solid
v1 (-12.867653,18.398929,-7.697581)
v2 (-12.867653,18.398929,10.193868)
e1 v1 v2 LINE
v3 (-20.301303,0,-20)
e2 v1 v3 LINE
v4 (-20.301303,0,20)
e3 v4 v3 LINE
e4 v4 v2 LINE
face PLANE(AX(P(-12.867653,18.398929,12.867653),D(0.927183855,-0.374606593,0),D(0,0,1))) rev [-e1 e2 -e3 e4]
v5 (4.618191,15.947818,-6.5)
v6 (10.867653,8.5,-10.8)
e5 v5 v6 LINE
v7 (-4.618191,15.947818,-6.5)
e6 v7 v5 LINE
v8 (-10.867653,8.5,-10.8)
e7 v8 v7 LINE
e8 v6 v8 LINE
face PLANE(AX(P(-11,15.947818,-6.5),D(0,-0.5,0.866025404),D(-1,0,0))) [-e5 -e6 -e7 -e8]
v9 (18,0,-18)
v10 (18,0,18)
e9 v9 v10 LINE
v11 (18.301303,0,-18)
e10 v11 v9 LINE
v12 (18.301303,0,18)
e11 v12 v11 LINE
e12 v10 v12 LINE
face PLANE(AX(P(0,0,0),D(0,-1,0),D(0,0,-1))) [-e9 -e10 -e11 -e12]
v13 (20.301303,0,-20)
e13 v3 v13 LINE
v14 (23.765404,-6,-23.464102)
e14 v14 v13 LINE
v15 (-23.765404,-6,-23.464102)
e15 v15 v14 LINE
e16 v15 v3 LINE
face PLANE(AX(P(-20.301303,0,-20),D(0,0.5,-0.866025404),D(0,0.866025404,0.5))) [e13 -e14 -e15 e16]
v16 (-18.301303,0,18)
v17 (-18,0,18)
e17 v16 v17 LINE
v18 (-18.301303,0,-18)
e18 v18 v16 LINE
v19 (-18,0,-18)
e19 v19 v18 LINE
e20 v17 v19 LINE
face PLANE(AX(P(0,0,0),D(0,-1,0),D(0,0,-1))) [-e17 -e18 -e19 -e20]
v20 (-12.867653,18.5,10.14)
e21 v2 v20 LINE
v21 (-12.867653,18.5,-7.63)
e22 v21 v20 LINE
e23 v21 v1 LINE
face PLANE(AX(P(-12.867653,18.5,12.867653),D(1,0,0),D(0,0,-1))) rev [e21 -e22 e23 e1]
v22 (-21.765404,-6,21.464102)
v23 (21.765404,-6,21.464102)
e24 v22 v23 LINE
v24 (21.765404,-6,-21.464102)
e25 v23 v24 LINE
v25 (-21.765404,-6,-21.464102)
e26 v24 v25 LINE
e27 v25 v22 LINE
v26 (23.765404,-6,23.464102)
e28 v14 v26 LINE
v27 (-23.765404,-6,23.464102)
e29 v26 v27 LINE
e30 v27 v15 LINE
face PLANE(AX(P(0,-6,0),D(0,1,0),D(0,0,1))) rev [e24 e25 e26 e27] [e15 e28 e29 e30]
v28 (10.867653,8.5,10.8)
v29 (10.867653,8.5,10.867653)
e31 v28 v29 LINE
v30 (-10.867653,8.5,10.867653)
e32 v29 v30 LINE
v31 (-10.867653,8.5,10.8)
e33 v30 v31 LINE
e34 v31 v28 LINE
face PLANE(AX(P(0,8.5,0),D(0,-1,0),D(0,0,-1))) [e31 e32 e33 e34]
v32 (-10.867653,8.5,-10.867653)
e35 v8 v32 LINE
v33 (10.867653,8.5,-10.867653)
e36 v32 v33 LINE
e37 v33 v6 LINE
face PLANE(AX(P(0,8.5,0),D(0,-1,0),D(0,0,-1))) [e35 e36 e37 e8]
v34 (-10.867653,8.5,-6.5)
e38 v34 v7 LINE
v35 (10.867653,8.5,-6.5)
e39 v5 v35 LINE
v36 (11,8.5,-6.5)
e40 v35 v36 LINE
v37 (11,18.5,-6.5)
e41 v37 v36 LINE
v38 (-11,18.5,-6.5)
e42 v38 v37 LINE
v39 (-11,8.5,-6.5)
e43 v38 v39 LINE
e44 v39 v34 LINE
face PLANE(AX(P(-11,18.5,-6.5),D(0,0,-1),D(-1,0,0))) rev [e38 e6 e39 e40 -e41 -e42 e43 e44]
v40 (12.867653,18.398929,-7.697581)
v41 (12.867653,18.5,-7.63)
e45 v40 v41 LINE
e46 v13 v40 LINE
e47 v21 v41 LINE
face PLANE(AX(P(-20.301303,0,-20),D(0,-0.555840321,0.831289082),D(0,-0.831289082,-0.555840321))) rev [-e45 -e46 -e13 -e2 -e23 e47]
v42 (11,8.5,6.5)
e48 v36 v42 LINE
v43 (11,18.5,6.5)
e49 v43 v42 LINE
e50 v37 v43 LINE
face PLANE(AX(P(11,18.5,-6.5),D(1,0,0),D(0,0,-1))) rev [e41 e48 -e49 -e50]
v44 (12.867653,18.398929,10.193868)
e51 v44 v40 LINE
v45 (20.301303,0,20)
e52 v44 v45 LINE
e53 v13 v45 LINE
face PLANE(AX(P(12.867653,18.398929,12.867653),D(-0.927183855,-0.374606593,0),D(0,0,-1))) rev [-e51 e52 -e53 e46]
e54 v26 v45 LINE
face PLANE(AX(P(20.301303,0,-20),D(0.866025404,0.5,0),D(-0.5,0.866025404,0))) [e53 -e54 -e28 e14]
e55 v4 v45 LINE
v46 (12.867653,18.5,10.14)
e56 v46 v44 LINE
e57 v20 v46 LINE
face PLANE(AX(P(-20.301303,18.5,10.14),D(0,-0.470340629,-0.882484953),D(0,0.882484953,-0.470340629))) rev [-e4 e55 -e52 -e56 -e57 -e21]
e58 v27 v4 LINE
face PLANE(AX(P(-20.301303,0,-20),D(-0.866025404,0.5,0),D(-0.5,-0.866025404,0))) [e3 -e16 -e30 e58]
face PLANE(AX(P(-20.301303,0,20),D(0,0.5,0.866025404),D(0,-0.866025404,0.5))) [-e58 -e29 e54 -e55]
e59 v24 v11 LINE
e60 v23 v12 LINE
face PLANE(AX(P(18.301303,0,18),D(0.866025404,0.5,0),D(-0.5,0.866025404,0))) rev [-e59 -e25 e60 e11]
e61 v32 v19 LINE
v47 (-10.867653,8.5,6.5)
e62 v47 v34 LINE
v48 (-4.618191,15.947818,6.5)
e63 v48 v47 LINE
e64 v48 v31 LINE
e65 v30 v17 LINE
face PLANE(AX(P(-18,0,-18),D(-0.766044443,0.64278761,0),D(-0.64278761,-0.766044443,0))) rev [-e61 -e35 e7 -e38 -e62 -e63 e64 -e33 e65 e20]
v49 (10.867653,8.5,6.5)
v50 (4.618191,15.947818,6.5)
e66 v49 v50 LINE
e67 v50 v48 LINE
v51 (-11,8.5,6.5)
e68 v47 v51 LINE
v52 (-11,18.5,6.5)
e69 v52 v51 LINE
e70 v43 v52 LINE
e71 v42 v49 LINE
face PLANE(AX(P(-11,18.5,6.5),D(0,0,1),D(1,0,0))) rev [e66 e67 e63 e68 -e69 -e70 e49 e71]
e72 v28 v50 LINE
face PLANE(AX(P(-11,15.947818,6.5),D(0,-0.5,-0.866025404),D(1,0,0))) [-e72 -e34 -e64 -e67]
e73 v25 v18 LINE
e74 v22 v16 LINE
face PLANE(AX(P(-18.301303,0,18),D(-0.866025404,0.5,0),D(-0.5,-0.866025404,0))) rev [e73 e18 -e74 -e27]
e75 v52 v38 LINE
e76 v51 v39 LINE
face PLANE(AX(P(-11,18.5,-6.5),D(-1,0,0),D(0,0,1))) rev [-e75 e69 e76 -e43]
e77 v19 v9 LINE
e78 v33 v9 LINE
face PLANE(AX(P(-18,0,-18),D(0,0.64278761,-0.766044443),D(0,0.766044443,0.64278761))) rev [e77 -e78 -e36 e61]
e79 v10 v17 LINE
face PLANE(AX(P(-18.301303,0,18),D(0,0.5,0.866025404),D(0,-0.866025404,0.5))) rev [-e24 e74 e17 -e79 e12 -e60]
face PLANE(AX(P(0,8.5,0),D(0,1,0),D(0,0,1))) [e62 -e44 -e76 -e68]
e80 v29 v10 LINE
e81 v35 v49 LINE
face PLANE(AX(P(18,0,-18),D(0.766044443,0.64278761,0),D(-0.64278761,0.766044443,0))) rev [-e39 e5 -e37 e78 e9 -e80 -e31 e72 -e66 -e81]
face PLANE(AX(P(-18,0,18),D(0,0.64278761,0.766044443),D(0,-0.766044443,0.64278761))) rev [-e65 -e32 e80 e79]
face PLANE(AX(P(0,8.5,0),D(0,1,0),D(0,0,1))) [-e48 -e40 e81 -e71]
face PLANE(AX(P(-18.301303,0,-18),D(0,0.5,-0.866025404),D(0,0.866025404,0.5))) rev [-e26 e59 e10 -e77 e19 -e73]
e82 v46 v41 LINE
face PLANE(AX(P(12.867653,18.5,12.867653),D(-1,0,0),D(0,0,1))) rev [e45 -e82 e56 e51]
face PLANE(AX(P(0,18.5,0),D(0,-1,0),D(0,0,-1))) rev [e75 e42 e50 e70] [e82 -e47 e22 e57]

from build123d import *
from OCP.BRepFilletAPI import BRepFilletAPI_MakeChamfer

# Parameters (mm, degrees)
SKETCH1_W               = 40
SKETCH1_H               = 40
BOSS_EXTRUDE1_DEPTH     = 8.5
BOSS_EXTRUDE1_TAPER     = 40
SKETCH2_W               = 36
SKETCH2_H               = 36
CUT_EXTRUDE1_DEPTH      = 15
CUT_EXTRUDE1_DRAFT      = -40
SKETCH4_W               = 25.73530627
SKETCH4_H               = 25.73530627
BOSS_EXTRUDE3_DEPTH     = 10
SKETCH5_W               = 22
SKETCH5_H               = 13
CUT_EXTRUDE2_DEPTH      = 31.000000133
CHAMFER2_SIZE           = 12
CHAMFER2_SIZE_2         = 9.89892863
CUT_EXTRUDE3_DEPTH      = 35.154586706
CUT_EXTRUDE3_DEPTH_BACK = 35.154586706
CHAMFER3_SIZE           = 4.3
CHAMFER3_SIZE2          = 7.447818473
CUT_EXTRUDE4_DEPTH      = 35.154586706
CUT_EXTRUDE4_DEPTH_BACK = 35.154586706
SKETCH9_W               = 40.602605658
SKETCH9_H               = 40
BOSS_EXTRUDE4_DEPTH     = 6
BOSS_EXTRUDE4_DRAFT     = -30
SKETCH10_W              = 36.602605658
SKETCH10_H              = 36
CUT_EXTRUDE5_DEPTH      = 10
CUT_EXTRUDE5_DRAFT      = 30


with BuildPart() as part:
    # Sketch1 → Boss-Extrude1 (new body)
    with BuildSketch(Plane(origin=(0, 0, 0), x_dir=(1, 0, 0), z_dir=(0, 1, 0))):
        Rectangle(SKETCH1_W, SKETCH1_H)
    extrude(amount=BOSS_EXTRUDE1_DEPTH, taper=BOSS_EXTRUDE1_TAPER)


with BuildPart() as cut_extrude1_tool:
    # Sketch2 → Cut-Extrude1 (with draft: the straight prism first)
    with BuildSketch(Plane.XZ):
        Rectangle(SKETCH2_W, SKETCH2_H)
    extrude(amount=-CUT_EXTRUDE1_DEPTH)
    # Cut-Extrude1: the draft: its side faces are tilted about the plane it starts from
    cut_extrude1_sides = [cut_extrude1_tool.faces().sort_by_distance(p)[0] for p in [
        (0, 7.5, -18),
        (18, 7.5, 0),
        (0, 7.5, 18),
        (-18, 7.5, 0),
    ]]
    draft(cut_extrude1_sides, Plane.XZ, CUT_EXTRUDE1_DRAFT)


with BuildPart() as part_1:
    add(part.part)

    # Cut-Extrude1: cut by cut_extrude1_tool
    add(cut_extrude1_tool.part, mode=Mode.SUBTRACT)

    # Sketch4 → Boss-Extrude3 (add)
    with BuildSketch(Plane(origin=(0, 8.5, 0), x_dir=(1, 0, 0), z_dir=(0, 1, 0))):
        Rectangle(SKETCH4_W, SKETCH4_H)
    extrude(amount=BOSS_EXTRUDE3_DEPTH)

    # Sketch5 → Cut-Extrude2 (cut, through all)
    with BuildSketch(Plane.XZ.offset(-8.5)):
        Rectangle(SKETCH5_W, SKETCH5_H)
    extrude(amount=-CUT_EXTRUDE2_DEPTH, mode=Mode.SUBTRACT)

    # Chamfer2
    # the kernel refuses this chamfer: 12, 9.89892863 mm, written as the material it adds along each edge
    with BuildSketch(Plane(origin=(12.867653135, 8.5, 44.011128682), x_dir=(0.6427876096865404, -0.7660444431189772, 0), z_dir=(0, 0, -1))) as chamfer2_piece_1_section:
        Polygon((CHAMFER2_SIZE, 0), (-CHAMFER2_SIZE_2 * 0.766044443108, -CHAMFER2_SIZE_2 * 0.642787609677), (0, 0), align=None)
    chamfer2_piece_1 = extrude(amount=88.022257365, mode=Mode.PRIVATE)
    chamfer2_piece_1 = split(chamfer2_piece_1, bisect_by=Plane(origin=(12.867653135, 0, 44.011128682), z_dir=(0, 1, 0)), keep=Keep.TOP, mode=Mode.PRIVATE)
    chamfer2_piece_1 = split(chamfer2_piece_1, bisect_by=Plane(origin=(12.867653135, -0.927920344, 20.676206983), z_dir=(0, -0.37460659341591307, -0.9271838545667871)), keep=Keep.TOP, mode=Mode.PRIVATE)
    chamfer2_piece_1 = split(chamfer2_piece_1, bisect_by=Plane(origin=(12.867653135, 29.644778588, -8.32403482), z_dir=(0, -0.37460659341591274, 0.9271838545667872)), keep=Keep.TOP, mode=Mode.PRIVATE)
    add(chamfer2_piece_1)
    with BuildSketch(Plane(origin=(-12.867653135, 8.5, -44.011128682), x_dir=(-0.6427876096865406, -0.766044443118977, 0), z_dir=(0, 0, 1))) as chamfer2_piece_2_section:
        Polygon((CHAMFER2_SIZE, 0), (-CHAMFER2_SIZE_2 * 0.766044443108, -CHAMFER2_SIZE_2 * 0.642787609677), (0, 0), align=None)
    chamfer2_piece_2 = extrude(amount=88.022257365, mode=Mode.PRIVATE)
    chamfer2_piece_2 = split(chamfer2_piece_2, bisect_by=Plane(origin=(-12.867653135, 0, -44.011128682), z_dir=(0, 1, 0)), keep=Keep.TOP, mode=Mode.PRIVATE)
    chamfer2_piece_2 = split(chamfer2_piece_2, bisect_by=Plane(origin=(-12.867653135, -0.927920344, -20.676206983), z_dir=(0, -0.37460659341591274, 0.9271838545667872)), keep=Keep.TOP, mode=Mode.PRIVATE)
    chamfer2_piece_2 = split(chamfer2_piece_2, bisect_by=Plane(origin=(-12.867653135, 29.644778588, 8.32403482), z_dir=(0, -0.37460659341591307, -0.9271838545667871)), keep=Keep.TOP, mode=Mode.PRIVATE)
    add(chamfer2_piece_2)
    with BuildSketch(Plane(origin=(-44.011128682, 8.5, 12.867653135), x_dir=(0, -0.766044443118977, 0.6427876096865405), z_dir=(1, 0, 0))) as chamfer2_piece_3_section:
        Polygon((CHAMFER2_SIZE, 0), (-CHAMFER2_SIZE_2 * 0.766044443108, -CHAMFER2_SIZE_2 * 0.642787609677), (0, 0), align=None)
    chamfer2_piece_3 = extrude(amount=88.022257365, mode=Mode.PRIVATE)
    chamfer2_piece_3 = split(chamfer2_piece_3, bisect_by=Plane(origin=(-44.011128682, 0, 12.867653135), z_dir=(0, 1, 0)), keep=Keep.TOP, mode=Mode.PRIVATE)
    chamfer2_piece_3 = split(chamfer2_piece_3, bisect_by=Plane(origin=(-20.676206983, -0.927920344, 12.867653135), z_dir=(0.927183854566787, -0.37460659341591307, 0)), keep=Keep.TOP, mode=Mode.PRIVATE)
    chamfer2_piece_3 = split(chamfer2_piece_3, bisect_by=Plane(origin=(8.32403482, 29.644778588, 12.867653135), z_dir=(-0.9271838545667872, -0.37460659341591274, 0)), keep=Keep.TOP, mode=Mode.PRIVATE)
    add(chamfer2_piece_3)
    with BuildSketch(Plane(origin=(44.011128682, 8.5, -12.867653135), x_dir=(0, -0.766044443118977, -0.6427876096865405), z_dir=(-1, 0, 0))) as chamfer2_piece_4_section:
        Polygon((CHAMFER2_SIZE, 0), (-CHAMFER2_SIZE_2 * 0.766044443108, -CHAMFER2_SIZE_2 * 0.642787609677), (0, 0), align=None)
    chamfer2_piece_4 = extrude(amount=88.022257365, mode=Mode.PRIVATE)
    chamfer2_piece_4 = split(chamfer2_piece_4, bisect_by=Plane(origin=(44.011128682, 0, -12.867653135), z_dir=(0, 1, 0)), keep=Keep.TOP, mode=Mode.PRIVATE)
    chamfer2_piece_4 = split(chamfer2_piece_4, bisect_by=Plane(origin=(-8.32403482, 29.644778588, -12.867653135), z_dir=(0.927183854566787, -0.37460659341591307, 0)), keep=Keep.TOP, mode=Mode.PRIVATE)
    chamfer2_piece_4 = split(chamfer2_piece_4, bisect_by=Plane(origin=(20.676206983, -0.927920344, -12.867653135), z_dir=(-0.9271838545667872, -0.37460659341591274, 0)), keep=Keep.TOP, mode=Mode.PRIVATE)
    add(chamfer2_piece_4)

    # Sketch7 → Cut-Extrude3 (cut, two sides: drawn at the far end of the back side and taken through both)
    with BuildSketch(Plane(origin=(0, 0, 0), x_dir=(0, 0, -1), z_dir=(1, 0, 0)).offset(-CUT_EXTRUDE3_DEPTH_BACK)):
        Polygon((-20, 0), (-24.78585356, 0), (-24.78585356, 18.532984169), (-10.14, 18.5), align=None)
    extrude(amount=CUT_EXTRUDE3_DEPTH + CUT_EXTRUDE3_DEPTH_BACK, mode=Mode.SUBTRACT)

    # Chamfer3: one chamfer whose edges measure the first distance from different faces: ONE call of the kernel's chamfer builder (chamfer() names one face for all edges)
    chamfer3_edges_1 = [part_1.edges().sort_by_distance(p)[0] for p in [
        (0, 8.5, 6.5),
    ]]
    chamfer3_side_1 = [part_1.faces().sort_by_distance(p)[0] for p in [
        (0, 8.5, 8.683826567),
    ]]
    chamfer3_edges_2 = [part_1.edges().sort_by_distance(p)[0] for p in [
        (0, 8.5, -6.5),
    ]]
    chamfer3_side_2 = [part_1.faces().sort_by_distance(p)[0] for p in [
        (0, 8.5, -8.683826567),
    ]]
    chamfer3 = BRepFilletAPI_MakeChamfer(part_1.part.solid().wrapped)
    for e in chamfer3_edges_1:
        chamfer3.Add(CHAMFER3_SIZE, CHAMFER3_SIZE2, e.wrapped, chamfer3_side_1[0].wrapped)  # the first distance lies on this face
    for e in chamfer3_edges_2:
        chamfer3.Add(CHAMFER3_SIZE, CHAMFER3_SIZE2, e.wrapped, chamfer3_side_2[0].wrapped)  # the first distance lies on this face
    add(Compound.cast(chamfer3.Shape()), mode=Mode.REPLACE)

    # Sketch8 → Cut-Extrude4 (cut, two sides: drawn at the far end of the back side and taken through both)
    with BuildSketch(Plane(origin=(0, 0, 0), x_dir=(0, 0, -1), z_dir=(1, 0, 0)).offset(-CUT_EXTRUDE4_DEPTH_BACK)):
        Polygon((7.63, 18.5), (12.867653135, 18.5), (21.160182577, 0), (20, 0), align=None)
    extrude(amount=CUT_EXTRUDE4_DEPTH + CUT_EXTRUDE4_DEPTH_BACK, mode=Mode.SUBTRACT)


with BuildPart() as boss_extrude4_tool:
    # Sketch9 → Boss-Extrude4 (with draft: the straight prism first)
    with BuildSketch(Plane.XZ):
        Rectangle(SKETCH9_W, SKETCH9_H)
    extrude(amount=BOSS_EXTRUDE4_DEPTH)
    # Boss-Extrude4: the draft: its side faces are tilted about the plane it starts from
    boss_extrude4_sides = [boss_extrude4_tool.faces().sort_by_distance(p)[0] for p in [
        (0, -3, -20),
        (20.301302829, -3, 0),
        (0, -3, 20),
        (-20.301302829, -3, 0),
    ]]
    draft(boss_extrude4_sides, Plane.XZ, BOSS_EXTRUDE4_DRAFT)


with BuildPart() as part_2:
    add(part_1.part)

    # Boss-Extrude4: add boss_extrude4_tool
    add(boss_extrude4_tool.part)


with BuildPart() as cut_extrude5_tool:
    # Sketch10 → Cut-Extrude5 (with draft: the straight prism first)
    with BuildSketch(Plane(origin=(0, 0, 0), x_dir=(1, 0, 0), z_dir=(0, 1, 0))):
        Rectangle(SKETCH10_W, SKETCH10_H)
    extrude(amount=-CUT_EXTRUDE5_DEPTH)
    # Cut-Extrude5: the draft: its side faces are tilted about the plane it starts from
    cut_extrude5_sides = [cut_extrude5_tool.faces().sort_by_distance(p)[0] for p in [
        (0, -5, 18),
        (18.301302829, -5, 0),
        (0, -5, -18),
        (-18.301302829, -5, 0),
    ]]
    draft(cut_extrude5_sides, Plane(origin=(0, 0, 0), x_dir=(1, 0, 0), z_dir=(0, 1, 0)), CUT_EXTRUDE5_DRAFT)


with BuildPart() as part_3:
    add(part_2.part)

    # Cut-Extrude5: cut by cut_extrude5_tool
    add(cut_extrude5_tool.part, mode=Mode.SUBTRACT)


solid = part_3.part
